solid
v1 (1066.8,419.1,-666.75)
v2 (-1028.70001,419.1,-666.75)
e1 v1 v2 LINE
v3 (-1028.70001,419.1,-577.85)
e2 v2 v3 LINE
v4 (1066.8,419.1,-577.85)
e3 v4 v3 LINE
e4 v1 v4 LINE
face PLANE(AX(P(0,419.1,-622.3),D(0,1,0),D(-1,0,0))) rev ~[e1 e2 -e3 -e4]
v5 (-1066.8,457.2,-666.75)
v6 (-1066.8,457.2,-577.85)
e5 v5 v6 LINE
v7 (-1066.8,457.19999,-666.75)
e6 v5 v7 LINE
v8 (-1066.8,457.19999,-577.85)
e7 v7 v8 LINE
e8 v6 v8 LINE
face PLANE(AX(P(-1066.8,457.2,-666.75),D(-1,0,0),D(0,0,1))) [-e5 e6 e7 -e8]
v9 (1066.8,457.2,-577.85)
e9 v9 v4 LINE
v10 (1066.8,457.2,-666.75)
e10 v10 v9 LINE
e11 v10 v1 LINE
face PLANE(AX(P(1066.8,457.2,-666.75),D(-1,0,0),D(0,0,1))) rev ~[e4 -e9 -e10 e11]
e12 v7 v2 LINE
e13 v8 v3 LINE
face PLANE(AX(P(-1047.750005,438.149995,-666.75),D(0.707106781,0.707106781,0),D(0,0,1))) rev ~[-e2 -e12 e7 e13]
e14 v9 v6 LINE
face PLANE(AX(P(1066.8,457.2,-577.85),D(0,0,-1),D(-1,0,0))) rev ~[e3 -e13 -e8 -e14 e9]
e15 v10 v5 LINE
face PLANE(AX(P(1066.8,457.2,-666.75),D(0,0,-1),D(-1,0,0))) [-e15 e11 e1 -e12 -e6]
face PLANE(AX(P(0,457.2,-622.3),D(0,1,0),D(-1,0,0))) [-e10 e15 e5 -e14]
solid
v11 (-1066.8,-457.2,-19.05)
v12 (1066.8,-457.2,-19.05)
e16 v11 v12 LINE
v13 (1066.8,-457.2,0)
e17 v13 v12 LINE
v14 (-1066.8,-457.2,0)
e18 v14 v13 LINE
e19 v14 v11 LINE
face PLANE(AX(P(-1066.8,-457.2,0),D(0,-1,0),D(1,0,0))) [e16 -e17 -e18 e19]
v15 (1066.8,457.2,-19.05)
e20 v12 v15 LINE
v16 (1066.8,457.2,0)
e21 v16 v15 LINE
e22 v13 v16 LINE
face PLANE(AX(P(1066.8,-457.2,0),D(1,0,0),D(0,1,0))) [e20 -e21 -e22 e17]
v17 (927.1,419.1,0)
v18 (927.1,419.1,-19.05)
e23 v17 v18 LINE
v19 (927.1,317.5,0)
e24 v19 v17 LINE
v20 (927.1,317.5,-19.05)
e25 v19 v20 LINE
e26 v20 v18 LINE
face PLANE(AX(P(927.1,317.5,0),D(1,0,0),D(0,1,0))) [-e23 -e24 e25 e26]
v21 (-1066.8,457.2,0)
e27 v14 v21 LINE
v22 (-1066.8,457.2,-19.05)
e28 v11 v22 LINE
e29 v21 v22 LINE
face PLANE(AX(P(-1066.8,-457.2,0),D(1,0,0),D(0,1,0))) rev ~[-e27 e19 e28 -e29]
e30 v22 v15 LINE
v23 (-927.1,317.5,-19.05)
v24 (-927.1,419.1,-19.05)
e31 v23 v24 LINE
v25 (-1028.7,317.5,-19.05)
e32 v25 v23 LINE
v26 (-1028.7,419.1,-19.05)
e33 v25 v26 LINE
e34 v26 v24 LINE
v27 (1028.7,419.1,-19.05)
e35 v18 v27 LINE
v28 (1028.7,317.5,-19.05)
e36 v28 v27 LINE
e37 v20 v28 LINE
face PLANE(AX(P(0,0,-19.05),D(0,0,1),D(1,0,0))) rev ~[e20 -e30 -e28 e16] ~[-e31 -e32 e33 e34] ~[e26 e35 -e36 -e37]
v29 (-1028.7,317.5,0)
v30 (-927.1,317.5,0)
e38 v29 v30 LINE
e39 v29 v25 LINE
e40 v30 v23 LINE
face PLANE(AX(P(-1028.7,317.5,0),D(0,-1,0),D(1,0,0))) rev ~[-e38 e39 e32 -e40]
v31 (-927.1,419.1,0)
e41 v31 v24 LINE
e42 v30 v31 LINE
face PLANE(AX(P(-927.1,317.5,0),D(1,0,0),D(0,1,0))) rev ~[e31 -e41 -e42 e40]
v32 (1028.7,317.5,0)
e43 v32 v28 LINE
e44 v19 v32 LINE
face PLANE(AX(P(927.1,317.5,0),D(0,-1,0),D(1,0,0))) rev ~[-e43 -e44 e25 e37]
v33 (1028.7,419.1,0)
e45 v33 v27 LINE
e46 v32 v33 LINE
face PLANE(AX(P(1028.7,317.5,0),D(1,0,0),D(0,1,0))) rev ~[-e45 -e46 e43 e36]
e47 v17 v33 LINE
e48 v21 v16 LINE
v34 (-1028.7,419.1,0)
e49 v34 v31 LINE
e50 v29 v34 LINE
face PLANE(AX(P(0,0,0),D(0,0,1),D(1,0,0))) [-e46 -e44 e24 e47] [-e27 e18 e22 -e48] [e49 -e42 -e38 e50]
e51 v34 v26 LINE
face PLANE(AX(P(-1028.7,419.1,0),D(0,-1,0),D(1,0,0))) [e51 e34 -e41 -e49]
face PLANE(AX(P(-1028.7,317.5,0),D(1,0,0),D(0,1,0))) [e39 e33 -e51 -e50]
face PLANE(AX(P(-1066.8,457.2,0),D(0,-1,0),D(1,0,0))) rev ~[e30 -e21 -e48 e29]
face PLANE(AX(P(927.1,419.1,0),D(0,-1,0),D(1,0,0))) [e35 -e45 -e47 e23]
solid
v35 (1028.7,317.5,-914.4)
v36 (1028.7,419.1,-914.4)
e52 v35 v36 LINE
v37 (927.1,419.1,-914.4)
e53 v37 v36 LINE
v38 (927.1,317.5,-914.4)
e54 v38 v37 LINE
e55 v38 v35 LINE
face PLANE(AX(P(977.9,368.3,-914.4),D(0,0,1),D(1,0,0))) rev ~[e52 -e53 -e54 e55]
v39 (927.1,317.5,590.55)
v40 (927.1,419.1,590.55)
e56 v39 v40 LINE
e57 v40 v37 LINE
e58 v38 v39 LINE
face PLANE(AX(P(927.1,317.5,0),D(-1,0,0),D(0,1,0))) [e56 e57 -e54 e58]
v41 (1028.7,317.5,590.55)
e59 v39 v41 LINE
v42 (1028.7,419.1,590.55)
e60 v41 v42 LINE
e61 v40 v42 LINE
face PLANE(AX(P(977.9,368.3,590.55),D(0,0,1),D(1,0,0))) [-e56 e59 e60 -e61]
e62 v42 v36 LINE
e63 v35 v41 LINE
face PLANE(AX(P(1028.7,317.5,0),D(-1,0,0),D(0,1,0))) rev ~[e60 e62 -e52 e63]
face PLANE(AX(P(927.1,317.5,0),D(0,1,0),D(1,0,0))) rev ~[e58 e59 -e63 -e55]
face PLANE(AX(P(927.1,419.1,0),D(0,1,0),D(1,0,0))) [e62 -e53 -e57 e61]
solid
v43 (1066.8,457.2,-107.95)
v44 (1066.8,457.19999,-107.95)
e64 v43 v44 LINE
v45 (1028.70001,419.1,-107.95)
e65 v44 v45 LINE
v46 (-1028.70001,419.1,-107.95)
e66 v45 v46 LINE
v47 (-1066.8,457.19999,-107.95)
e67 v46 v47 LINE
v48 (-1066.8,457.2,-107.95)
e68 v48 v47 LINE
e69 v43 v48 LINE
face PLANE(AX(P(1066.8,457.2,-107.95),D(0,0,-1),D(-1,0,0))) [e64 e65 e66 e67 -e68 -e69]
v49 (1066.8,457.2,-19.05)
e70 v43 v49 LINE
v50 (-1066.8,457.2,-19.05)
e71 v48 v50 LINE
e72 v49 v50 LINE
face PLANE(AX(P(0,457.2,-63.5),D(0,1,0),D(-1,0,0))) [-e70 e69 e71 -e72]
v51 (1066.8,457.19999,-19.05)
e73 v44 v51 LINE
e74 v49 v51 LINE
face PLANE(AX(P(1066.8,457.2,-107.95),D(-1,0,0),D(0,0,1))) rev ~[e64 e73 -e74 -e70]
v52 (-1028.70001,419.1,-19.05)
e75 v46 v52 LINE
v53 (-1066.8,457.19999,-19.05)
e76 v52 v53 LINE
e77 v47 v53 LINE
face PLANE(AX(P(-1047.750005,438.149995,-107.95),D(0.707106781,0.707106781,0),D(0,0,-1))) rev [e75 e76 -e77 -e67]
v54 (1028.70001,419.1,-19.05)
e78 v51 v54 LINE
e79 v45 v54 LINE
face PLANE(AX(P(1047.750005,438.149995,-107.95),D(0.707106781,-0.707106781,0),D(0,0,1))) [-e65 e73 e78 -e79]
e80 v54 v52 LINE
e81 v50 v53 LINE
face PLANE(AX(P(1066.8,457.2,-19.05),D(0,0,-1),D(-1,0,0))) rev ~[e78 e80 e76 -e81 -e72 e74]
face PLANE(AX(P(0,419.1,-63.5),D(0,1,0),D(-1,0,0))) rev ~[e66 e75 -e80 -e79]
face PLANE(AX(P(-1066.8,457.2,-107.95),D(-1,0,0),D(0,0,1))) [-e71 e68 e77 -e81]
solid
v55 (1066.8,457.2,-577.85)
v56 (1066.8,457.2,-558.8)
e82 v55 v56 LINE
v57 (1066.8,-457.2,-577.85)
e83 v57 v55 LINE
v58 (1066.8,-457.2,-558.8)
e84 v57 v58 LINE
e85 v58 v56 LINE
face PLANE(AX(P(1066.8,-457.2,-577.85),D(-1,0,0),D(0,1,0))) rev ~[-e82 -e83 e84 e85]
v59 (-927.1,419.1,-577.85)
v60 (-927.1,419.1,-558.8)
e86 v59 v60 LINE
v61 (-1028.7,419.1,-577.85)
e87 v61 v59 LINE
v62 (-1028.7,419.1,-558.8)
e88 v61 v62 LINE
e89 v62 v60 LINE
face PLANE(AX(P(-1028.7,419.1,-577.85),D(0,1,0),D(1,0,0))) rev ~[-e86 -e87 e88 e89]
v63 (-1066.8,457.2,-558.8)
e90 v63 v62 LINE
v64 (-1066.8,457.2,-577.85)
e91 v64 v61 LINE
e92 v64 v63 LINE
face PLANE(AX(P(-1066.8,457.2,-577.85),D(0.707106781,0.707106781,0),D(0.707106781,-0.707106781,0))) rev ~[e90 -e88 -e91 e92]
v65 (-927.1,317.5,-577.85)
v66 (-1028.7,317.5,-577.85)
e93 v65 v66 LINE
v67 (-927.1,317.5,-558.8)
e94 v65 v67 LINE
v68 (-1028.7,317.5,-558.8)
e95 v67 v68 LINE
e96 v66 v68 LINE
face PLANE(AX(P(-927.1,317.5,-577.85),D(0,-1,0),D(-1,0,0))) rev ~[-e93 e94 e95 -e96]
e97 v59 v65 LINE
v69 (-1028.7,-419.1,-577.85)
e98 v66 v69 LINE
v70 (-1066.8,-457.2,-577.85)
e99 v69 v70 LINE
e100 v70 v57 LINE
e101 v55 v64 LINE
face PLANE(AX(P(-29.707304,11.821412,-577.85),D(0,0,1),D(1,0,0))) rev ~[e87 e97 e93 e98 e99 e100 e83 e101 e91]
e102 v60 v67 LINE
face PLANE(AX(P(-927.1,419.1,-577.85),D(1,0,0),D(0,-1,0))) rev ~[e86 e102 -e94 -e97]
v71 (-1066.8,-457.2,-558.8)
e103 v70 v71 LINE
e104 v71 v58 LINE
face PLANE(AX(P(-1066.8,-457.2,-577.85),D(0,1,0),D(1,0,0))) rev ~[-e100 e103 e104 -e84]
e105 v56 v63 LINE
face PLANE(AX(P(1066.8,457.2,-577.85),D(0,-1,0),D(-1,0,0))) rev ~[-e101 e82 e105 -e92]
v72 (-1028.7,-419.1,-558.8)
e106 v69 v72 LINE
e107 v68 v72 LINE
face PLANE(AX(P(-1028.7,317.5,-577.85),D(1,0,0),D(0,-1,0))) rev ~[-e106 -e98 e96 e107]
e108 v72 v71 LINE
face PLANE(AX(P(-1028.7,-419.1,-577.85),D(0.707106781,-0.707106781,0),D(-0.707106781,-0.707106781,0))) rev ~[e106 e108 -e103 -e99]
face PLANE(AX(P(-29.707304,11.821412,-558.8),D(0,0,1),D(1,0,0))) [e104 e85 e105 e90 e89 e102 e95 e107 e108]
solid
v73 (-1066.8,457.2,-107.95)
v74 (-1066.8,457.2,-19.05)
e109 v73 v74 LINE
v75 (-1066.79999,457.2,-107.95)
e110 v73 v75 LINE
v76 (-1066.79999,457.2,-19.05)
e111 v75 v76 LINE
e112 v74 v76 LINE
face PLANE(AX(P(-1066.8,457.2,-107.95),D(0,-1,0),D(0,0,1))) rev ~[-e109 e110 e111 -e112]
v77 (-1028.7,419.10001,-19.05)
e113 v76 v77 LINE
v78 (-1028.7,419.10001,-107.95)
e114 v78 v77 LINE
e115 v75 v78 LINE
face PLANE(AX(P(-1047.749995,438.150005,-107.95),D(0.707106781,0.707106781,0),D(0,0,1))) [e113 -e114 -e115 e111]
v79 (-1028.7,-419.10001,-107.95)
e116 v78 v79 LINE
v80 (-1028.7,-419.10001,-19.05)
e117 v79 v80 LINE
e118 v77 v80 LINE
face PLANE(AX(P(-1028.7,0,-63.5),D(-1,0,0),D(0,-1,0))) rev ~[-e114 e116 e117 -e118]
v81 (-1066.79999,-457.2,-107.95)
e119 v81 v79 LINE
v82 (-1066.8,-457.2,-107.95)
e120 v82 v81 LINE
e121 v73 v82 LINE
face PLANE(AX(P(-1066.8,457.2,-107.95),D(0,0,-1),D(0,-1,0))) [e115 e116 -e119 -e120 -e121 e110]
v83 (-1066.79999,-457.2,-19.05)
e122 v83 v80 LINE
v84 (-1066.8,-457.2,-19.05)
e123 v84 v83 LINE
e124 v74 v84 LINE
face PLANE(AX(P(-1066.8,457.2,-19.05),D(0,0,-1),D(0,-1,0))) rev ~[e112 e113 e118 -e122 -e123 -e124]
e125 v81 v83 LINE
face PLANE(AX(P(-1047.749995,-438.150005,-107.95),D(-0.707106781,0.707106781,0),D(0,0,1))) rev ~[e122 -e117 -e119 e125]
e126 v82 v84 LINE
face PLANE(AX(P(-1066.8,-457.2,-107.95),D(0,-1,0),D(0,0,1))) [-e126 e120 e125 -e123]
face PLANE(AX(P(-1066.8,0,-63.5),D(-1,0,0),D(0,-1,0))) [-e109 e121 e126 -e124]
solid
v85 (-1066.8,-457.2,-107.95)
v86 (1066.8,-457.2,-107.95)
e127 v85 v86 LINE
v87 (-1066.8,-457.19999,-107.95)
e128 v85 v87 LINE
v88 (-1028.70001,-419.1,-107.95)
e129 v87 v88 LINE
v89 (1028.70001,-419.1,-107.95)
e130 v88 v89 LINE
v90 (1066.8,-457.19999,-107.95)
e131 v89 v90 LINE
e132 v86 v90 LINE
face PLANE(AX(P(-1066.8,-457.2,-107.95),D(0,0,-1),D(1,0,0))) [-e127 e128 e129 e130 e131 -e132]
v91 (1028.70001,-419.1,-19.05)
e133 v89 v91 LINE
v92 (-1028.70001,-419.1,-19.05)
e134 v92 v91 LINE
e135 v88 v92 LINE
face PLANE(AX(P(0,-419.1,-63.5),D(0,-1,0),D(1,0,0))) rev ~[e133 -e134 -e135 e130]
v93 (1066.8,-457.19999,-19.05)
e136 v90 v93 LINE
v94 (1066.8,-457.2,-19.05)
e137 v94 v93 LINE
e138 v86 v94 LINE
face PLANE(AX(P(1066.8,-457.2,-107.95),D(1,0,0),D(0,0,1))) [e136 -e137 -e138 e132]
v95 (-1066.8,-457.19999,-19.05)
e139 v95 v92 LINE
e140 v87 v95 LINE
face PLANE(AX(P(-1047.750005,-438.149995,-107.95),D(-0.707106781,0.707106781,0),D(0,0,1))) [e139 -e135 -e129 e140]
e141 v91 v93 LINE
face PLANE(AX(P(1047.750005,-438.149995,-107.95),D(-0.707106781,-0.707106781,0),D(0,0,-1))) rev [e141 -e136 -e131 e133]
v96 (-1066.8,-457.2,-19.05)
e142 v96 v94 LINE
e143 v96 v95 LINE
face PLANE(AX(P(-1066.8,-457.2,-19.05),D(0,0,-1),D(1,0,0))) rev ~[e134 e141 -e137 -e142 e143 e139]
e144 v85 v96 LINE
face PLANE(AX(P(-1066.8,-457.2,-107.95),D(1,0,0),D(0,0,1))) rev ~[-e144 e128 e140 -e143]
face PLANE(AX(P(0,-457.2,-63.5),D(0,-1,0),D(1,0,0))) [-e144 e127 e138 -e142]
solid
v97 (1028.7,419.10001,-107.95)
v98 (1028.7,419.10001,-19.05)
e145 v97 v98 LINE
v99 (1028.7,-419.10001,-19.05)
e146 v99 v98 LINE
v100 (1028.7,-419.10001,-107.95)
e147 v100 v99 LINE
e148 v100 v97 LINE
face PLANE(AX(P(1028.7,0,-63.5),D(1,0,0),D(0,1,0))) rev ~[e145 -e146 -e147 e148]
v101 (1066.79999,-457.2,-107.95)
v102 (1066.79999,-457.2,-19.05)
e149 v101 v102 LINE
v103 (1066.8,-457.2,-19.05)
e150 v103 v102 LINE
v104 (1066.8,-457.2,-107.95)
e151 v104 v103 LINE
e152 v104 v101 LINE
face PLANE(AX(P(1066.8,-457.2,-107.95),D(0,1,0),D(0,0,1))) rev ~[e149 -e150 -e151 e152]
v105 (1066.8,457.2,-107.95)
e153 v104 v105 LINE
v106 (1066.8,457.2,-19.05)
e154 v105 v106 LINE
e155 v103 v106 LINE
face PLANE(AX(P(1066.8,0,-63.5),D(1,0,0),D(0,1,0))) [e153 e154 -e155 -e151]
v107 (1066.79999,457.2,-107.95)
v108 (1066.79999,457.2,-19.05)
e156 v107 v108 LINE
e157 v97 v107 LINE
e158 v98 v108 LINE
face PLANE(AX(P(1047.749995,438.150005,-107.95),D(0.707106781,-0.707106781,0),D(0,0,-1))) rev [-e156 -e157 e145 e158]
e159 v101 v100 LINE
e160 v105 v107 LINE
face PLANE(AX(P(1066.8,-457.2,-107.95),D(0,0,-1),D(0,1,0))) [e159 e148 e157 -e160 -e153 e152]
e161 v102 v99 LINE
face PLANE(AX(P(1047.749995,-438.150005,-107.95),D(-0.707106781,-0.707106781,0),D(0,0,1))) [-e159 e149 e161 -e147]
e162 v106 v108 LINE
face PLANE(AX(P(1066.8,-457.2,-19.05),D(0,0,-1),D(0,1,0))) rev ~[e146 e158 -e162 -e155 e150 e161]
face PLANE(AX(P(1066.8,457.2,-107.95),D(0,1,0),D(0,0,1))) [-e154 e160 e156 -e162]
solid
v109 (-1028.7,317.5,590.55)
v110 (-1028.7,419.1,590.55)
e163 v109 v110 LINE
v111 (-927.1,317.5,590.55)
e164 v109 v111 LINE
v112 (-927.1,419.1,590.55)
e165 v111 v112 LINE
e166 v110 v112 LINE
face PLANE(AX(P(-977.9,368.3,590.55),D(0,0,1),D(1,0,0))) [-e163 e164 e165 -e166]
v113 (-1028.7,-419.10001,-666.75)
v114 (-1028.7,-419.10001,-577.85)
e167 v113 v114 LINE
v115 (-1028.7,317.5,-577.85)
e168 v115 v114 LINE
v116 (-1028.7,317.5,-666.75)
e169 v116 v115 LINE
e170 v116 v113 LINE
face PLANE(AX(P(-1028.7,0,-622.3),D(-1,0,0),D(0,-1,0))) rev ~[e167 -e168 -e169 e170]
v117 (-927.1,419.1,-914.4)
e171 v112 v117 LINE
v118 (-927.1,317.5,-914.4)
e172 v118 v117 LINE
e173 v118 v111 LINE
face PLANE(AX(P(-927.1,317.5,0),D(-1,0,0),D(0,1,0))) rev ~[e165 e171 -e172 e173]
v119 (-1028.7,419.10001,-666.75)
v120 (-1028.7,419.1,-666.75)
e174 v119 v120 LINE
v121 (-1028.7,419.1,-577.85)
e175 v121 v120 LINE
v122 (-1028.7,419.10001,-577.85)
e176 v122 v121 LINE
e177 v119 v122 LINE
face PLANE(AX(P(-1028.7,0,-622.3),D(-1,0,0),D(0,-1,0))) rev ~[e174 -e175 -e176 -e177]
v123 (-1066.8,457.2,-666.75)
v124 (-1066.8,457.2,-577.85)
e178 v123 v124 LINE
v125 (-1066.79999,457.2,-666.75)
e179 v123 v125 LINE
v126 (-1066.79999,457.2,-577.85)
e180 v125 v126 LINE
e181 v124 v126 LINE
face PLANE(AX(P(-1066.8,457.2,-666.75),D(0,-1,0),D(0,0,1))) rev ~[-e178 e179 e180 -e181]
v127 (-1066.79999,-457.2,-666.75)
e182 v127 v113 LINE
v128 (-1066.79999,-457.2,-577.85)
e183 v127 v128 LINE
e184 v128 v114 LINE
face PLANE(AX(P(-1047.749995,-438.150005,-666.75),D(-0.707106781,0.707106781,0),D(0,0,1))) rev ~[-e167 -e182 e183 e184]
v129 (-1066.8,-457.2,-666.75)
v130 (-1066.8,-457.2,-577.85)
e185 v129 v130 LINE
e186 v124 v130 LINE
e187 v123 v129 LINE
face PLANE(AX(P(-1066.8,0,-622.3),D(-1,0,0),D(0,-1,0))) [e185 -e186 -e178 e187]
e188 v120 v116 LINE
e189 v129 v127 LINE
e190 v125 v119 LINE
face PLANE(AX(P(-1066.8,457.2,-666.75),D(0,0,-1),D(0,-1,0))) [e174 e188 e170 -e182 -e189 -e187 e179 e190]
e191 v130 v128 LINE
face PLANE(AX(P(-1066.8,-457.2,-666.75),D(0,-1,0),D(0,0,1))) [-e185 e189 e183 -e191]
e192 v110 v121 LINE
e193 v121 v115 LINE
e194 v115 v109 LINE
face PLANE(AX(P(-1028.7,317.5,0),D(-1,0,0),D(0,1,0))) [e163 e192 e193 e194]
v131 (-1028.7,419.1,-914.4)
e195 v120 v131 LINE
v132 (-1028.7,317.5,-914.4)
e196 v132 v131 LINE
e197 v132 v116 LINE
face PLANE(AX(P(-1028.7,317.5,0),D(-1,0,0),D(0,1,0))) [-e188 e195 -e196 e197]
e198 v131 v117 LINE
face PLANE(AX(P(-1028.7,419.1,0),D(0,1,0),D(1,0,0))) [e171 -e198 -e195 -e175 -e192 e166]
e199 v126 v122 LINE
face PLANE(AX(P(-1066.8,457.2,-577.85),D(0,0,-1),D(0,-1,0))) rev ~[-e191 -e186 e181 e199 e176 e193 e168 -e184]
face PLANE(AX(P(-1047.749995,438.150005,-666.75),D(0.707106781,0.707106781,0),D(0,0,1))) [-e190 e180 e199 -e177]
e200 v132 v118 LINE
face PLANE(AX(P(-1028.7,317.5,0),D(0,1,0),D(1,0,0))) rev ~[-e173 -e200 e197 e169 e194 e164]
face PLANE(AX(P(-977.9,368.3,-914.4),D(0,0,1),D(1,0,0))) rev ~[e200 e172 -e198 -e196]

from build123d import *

# Parameters (mm, degrees)
F0_W           = 2133.6
F0_H           = 914.4
F0_W_2         = 101.6
F0_H_2         = 101.6
F1_DEPTH       = 19.05
F2_W           = 2133.6
F2_H           = 88.9
F3_DEPTH       = 38.1
F4_SIZE        = 38.09999
F5_SIZE        = 38.09999
F6_W           = 914.4
F6_H           = 88.9
F7_DEPTH       = 38.1
F8_SIZE        = 38.09999
F9_SIZE        = 38.09999
F10_W          = 2133.6
F10_H          = 88.9
F11_DEPTH      = 38.1
F12_SIZE       = 38.09999
F13_SIZE       = 38.09999
F14_W          = 914.4
F14_H          = 88.9
F15_DEPTH      = 38.1
F16_SIZE       = 38.09999
F17_DEPTH      = 914.4
F17_DEPTH_BACK = 590.55
F18_W          = 914.4
F18_H          = 88.9
F19_DEPTH      = 38.1
F20_SIZE       = 38.09999
F23_DEPTH      = 19.05
F21_W          = 2133.6
F21_H          = 88.9
F24_DEPTH      = 38.1
F25_SIZE       = 38.09999


# Not quite as in the source:
# - a fillet or chamfer is up to 0.001 mm smaller than in the source, because OpenCascade refuses the exact size


with BuildPart() as f1:
    # F0 (on Top) → F1 (new body)
    with BuildSketch(Plane.XY):
        Rectangle(F0_W, F0_H)
        with Locations((-977.9, 368.3)):
            Rectangle(F0_W_2, F0_H_2, mode=Mode.SUBTRACT)
        with Locations((977.9, 368.3)):
            Rectangle(F0_W_2, F0_H_2, mode=Mode.SUBTRACT)
    extrude(amount=-F1_DEPTH)


with BuildPart() as f3:
    # F2 (on face) → F3 (new body)
    with BuildSketch(Plane.XZ.offset(457.2)):
        with Locations((0, -63.5)):
            Rectangle(F2_W, F2_H)
    extrude(amount=-F3_DEPTH)

    # F4 (size 38.1 in the source; OpenCascade refuses exactly that, so slightly less here)
    f4_edges = [f3.edges().sort_by_distance(p)[0] for p in [
        (-1066.8, -419.1, -63.5),
    ]]
    chamfer(f4_edges, length=F4_SIZE)

    # F5 (size 38.1 in the source; OpenCascade refuses exactly that, so slightly less here)
    f5_edges = [f3.edges().sort_by_distance(p)[0] for p in [
        (1066.8, -419.1, -63.5),
    ]]
    chamfer(f5_edges, length=F5_SIZE)


with BuildPart() as f7:
    # F6 (on face) → F7 (new body)
    with BuildSketch(Plane.YZ.offset(1066.8)):
        with Locations((0, -63.5)):
            Rectangle(F6_W, F6_H)
    extrude(amount=-F7_DEPTH)

    # F8 (size 38.1 in the source; OpenCascade refuses exactly that, so slightly less here)
    f8_edges = [f7.edges().sort_by_distance(p)[0] for p in [
        (1028.7, -457.2, -63.5),
    ]]
    chamfer(f8_edges, length=F8_SIZE)

    # F9 (size 38.1 in the source; OpenCascade refuses exactly that, so slightly less here)
    f9_edges = [f7.edges().sort_by_distance(p)[0] for p in [
        (1028.7, 457.2, -63.5),
    ]]
    chamfer(f9_edges, length=F9_SIZE)


with BuildPart() as f11:
    # F10 (on face) → F11 (new body)
    with BuildSketch(Plane(origin=(0, 457.2, 0), x_dir=(-1, 0, 0), z_dir=(0, 1, 0))):
        with Locations((0, -63.5)):
            Rectangle(F10_W, F10_H)
    extrude(amount=-F11_DEPTH)

    # F12 (size 38.1 in the source; OpenCascade refuses exactly that, so slightly less here)
    f12_edges = [f11.edges().sort_by_distance(p)[0] for p in [
        (1066.8, 419.1, -63.5),
    ]]
    chamfer(f12_edges, length=F12_SIZE)

    # F13 (size 38.1 in the source; OpenCascade refuses exactly that, so slightly less here)
    f13_edges = [f11.edges().sort_by_distance(p)[0] for p in [
        (-1066.8, 419.1, -63.5),
    ]]
    chamfer(f13_edges, length=F13_SIZE)


with BuildPart() as f15:
    # F14 (on face) → F15 (new body)
    with BuildSketch(Plane(origin=(-1066.8, 0, 0), x_dir=(0, -1, 0), z_dir=(-1, 0, 0))):
        with Locations((0, -63.5)):
            Rectangle(F14_W, F14_H)
    extrude(amount=-F15_DEPTH)

    # F16 (size 38.1 in the source; OpenCascade refuses exactly that, so slightly less here)
    f16_edges = [f15.edges().sort_by_distance(p)[0] for p in [
        (-1028.7, 457.2, -63.5),
        (-1028.7, -457.2, -63.5),
    ]]
    chamfer(f16_edges, length=F16_SIZE)


with BuildPart() as f17:
    # F0 (on Top) → F17 (new body, two sides)
    with BuildSketch(Plane.XY) as f17_sk:
        with Locations((-977.9, 368.3)):
            Rectangle(F0_W_2, F0_H_2)
    extrude(amount=-F17_DEPTH)
    extrude(f17_sk.sketch, amount=F17_DEPTH_BACK)

    # F18 (on face) → F19 (join)
    with BuildSketch(Plane(origin=(-1066.8, 0, 0), x_dir=(0, -1, 0), z_dir=(-1, 0, 0))):
        with Locations((0, -622.3)):
            Rectangle(F18_W, F18_H)
    extrude(amount=-F19_DEPTH)

    # F20 (size 38.1 in the source; OpenCascade refuses exactly that, so slightly less here)
    f20_edges = [f17.edges().sort_by_distance(p)[0] for p in [
        (-1028.7, -457.2, -622.3),
        (-1028.7, 457.2, -622.3),
    ]]
    chamfer(f20_edges, length=F20_SIZE)


with BuildPart() as f17b:
    # F0 (on Top) → F17, piece 2 (new body, two sides)
    with BuildSketch(Plane.XY) as f17_2_sk:
        with Locations((977.9, 368.3)):
            Rectangle(F0_W_2, F0_H_2)
    extrude(amount=-F17_DEPTH)
    extrude(f17_2_sk.sketch, amount=F17_DEPTH_BACK)


with BuildPart() as f23:
    # F22 (on face) → F23 (new body)
    with BuildSketch(Plane.XY.offset(-577.85)):
        Polygon((1066.8, 457.2), (-1066.8, 457.2), (-1028.7, 419.1), (-927.1, 419.1), (-927.1, 317.5), (-1028.7, 317.5), (-1028.7, -419.1), (-1066.8, -457.2), (1066.8, -457.2), align=None)
    extrude(amount=F23_DEPTH)


with BuildPart() as f24:
    # F21 (on face) → F24 (new body)
    with BuildSketch(Plane(origin=(0, 457.2, 0), x_dir=(-1, 0, 0), z_dir=(0, 1, 0))):
        with Locations((0, -622.3)):
            Rectangle(F21_W, F21_H)
    extrude(amount=-F24_DEPTH)

    # F25 (size 38.1 in the source; OpenCascade refuses exactly that, so slightly less here)
    f25_edges = [f24.edges().sort_by_distance(p)[0] for p in [
        (-1066.8, 419.1, -622.3),
    ]]
    chamfer(f25_edges, length=F25_SIZE)


solid = Compound([f1.part, f3.part, f7.part, f11.part, f15.part, f17.part, f17b.part, f23.part, f24.part])
